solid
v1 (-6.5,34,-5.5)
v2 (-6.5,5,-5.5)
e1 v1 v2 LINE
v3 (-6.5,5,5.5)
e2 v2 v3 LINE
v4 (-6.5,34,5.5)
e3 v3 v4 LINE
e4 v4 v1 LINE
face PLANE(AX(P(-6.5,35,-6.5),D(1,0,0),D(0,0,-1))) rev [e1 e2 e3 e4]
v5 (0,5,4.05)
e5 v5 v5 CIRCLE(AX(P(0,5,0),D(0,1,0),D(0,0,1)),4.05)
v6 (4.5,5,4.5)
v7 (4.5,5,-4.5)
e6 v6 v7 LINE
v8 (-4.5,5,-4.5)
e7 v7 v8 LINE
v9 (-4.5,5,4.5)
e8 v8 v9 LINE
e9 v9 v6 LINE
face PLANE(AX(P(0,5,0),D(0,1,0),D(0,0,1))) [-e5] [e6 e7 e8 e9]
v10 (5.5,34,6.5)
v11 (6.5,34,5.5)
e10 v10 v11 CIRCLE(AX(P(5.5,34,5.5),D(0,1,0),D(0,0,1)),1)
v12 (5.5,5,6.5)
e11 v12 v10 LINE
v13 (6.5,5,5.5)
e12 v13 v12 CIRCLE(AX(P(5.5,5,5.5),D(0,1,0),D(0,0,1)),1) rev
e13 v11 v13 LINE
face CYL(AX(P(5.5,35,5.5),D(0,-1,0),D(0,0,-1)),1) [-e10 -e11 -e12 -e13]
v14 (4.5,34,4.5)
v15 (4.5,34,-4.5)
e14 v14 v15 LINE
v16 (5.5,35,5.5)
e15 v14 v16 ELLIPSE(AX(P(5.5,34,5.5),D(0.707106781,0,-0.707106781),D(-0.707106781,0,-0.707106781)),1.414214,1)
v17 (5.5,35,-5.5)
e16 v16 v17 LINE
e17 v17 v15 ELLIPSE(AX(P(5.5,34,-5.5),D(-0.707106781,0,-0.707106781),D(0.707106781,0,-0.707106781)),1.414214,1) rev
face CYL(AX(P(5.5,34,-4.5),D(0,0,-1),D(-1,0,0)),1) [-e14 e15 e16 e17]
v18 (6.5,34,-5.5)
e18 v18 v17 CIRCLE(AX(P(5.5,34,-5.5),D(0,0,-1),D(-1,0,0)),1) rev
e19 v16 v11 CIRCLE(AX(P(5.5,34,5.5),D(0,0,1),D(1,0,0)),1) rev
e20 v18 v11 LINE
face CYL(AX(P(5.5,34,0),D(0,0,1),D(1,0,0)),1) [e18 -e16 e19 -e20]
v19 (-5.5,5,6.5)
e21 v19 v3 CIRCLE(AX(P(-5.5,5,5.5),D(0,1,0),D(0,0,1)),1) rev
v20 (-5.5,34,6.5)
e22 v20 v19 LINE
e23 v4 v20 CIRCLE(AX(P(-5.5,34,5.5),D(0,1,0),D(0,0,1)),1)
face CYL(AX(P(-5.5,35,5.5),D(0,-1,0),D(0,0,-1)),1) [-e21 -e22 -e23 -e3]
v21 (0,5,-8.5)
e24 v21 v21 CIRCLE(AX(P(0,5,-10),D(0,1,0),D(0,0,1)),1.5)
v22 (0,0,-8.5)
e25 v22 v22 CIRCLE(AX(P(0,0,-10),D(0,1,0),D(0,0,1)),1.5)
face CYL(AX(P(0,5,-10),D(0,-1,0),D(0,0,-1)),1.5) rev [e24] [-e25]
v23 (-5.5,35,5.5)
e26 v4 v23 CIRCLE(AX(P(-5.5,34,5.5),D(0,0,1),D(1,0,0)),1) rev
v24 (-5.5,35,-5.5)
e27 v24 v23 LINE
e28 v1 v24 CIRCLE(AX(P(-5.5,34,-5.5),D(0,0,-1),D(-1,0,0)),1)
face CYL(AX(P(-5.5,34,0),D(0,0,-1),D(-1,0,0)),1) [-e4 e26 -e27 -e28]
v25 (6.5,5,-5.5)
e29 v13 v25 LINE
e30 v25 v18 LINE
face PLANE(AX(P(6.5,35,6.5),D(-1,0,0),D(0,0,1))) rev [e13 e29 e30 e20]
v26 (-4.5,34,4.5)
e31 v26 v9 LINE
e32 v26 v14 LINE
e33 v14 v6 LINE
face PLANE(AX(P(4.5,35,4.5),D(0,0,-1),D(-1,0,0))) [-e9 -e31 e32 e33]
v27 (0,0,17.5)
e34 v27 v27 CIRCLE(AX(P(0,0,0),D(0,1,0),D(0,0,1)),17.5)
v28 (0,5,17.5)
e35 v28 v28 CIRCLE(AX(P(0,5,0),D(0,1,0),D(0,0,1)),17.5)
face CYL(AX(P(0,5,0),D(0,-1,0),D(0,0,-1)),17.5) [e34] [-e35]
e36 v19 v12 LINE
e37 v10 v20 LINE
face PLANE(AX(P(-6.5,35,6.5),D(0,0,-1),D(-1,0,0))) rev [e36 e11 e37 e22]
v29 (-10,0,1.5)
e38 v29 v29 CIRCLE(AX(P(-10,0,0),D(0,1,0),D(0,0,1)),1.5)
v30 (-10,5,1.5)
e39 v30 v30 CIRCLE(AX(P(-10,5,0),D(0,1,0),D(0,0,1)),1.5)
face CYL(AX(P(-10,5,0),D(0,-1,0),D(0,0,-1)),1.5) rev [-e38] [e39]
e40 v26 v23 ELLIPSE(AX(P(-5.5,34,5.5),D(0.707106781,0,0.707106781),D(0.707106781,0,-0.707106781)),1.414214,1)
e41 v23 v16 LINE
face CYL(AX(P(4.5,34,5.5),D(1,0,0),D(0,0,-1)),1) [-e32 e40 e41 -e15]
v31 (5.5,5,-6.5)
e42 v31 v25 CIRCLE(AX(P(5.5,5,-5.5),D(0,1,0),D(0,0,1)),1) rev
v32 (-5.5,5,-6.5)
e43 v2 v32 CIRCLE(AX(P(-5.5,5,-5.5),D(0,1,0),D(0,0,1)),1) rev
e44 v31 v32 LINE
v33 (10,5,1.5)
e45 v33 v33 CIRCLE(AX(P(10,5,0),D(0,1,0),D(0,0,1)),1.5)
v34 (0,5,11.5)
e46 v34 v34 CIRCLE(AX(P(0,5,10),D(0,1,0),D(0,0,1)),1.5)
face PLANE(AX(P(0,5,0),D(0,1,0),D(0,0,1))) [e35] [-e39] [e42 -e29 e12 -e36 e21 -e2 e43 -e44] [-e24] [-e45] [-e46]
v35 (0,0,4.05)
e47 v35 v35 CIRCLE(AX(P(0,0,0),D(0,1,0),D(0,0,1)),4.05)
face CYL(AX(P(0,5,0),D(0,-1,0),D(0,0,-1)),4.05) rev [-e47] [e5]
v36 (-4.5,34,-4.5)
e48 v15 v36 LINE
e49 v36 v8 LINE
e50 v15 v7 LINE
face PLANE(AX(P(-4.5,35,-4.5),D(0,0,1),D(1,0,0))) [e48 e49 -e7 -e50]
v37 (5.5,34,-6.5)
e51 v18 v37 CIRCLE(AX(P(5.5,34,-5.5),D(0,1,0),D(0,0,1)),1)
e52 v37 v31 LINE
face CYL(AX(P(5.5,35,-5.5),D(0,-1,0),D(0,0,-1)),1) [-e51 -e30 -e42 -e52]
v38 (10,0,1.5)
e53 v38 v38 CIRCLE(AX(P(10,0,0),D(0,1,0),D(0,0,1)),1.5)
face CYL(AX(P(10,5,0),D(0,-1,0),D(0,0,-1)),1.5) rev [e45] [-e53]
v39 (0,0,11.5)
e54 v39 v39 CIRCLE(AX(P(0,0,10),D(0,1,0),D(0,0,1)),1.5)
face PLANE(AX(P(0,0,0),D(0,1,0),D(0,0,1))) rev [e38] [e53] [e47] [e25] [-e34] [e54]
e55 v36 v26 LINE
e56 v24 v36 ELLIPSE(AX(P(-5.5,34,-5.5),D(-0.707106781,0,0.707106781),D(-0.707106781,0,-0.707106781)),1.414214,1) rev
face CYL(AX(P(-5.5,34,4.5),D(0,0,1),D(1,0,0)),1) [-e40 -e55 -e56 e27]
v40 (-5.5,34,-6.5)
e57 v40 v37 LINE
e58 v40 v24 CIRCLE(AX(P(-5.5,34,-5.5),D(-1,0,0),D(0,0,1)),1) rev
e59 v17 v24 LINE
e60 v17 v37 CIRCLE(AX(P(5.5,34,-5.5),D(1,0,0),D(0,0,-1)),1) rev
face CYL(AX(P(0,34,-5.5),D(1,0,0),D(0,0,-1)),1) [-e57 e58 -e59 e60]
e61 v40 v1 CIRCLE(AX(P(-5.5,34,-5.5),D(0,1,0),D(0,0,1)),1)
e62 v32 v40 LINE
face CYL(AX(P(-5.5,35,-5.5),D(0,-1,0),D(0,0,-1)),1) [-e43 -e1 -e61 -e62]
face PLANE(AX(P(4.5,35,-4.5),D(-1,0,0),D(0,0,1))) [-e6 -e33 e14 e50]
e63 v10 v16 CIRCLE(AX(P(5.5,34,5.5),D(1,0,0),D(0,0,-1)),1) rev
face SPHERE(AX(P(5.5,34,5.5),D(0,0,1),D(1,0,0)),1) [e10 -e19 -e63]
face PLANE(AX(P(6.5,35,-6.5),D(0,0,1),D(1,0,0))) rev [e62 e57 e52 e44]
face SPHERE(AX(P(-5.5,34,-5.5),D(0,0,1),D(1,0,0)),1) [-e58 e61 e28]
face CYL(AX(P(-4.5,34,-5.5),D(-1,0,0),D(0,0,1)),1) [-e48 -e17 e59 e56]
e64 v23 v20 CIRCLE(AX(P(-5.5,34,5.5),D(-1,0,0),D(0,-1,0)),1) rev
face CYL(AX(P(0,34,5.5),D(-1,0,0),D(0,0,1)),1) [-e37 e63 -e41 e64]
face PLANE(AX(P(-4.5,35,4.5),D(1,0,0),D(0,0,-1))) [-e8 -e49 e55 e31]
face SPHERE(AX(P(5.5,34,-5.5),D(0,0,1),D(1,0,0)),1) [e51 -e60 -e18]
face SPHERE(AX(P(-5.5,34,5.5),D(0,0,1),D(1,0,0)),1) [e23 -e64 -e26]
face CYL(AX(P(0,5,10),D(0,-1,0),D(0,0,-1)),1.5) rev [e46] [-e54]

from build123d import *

# Parameters (mm, degrees)
SKETCH_1_R      = 17.5
SKETCH_1_R_2    = 4.05
SKETCH_1_R_3    = 1.5
EXTRUDE_1_DEPTH = 5
SKETCH_2_W      = 13
SKETCH_2_H      = 13
SKETCH_2_W_2    = 9
SKETCH_2_H_2    = 9
EXTRUDE_2_DEPTH = 30
FILLET_1_R      = 1


with BuildPart() as part:
    # 草图1 → 凸台-拉伸1 (new body)
    with BuildSketch(Plane(origin=(0, 0, 0), x_dir=(1, 0, 0), z_dir=(0, 1, 0))):
        with Locations(Location((0, 0, 0), (0, 0, 270))):
            Circle(SKETCH_1_R)
        with Locations(Location((0, 0, 0), (0, 0, 270))):
            Circle(SKETCH_1_R_2, mode=Mode.SUBTRACT)
        with Locations(Location((0, 10, 0), (0, 0, 270))):
            Circle(SKETCH_1_R_3, mode=Mode.SUBTRACT)
        with Locations(Location((10, 0, 0), (0, 0, 270))):
            Circle(SKETCH_1_R_3, mode=Mode.SUBTRACT)
        with Locations(Location((0, -10, 0), (0, 0, 270))):
            Circle(SKETCH_1_R_3, mode=Mode.SUBTRACT)
        with Locations(Location((-10, 0, 0), (0, 0, 270))):
            Circle(SKETCH_1_R_3, mode=Mode.SUBTRACT)
    extrude(amount=EXTRUDE_1_DEPTH)

    # 草图2 → 凸台-拉伸2 (add)
    with BuildSketch(Plane(origin=(0, 5, 0), x_dir=(1, 0, 0), z_dir=(0, 1, 0))):
        Rectangle(SKETCH_2_W, SKETCH_2_H)
        Rectangle(SKETCH_2_W_2, SKETCH_2_H_2, mode=Mode.SUBTRACT)
    extrude(amount=EXTRUDE_2_DEPTH)

    # 圆角1
    fillet_1_edges = [part.edges().sort_by_distance(p)[0] for p in [
        (0, 35, -6.5),
        (-6.5, 35, 0),
        (0, 35, 6.5),
        (6.5, 35, 0),
        (6.5, 20, -6.5),
        (-6.5, 20, -6.5),
        (-6.5, 20, 6.5),
        (6.5, 20, 6.5),
        (-4.5, 35, 0),
        (0, 35, 4.5),
        (4.5, 35, 0),
        (0, 35, -4.5),
    ]]
    fillet(fillet_1_edges, radius=FILLET_1_R - 0.0001)  # a hair under: the kernel refuses the full size


solid = part.part
